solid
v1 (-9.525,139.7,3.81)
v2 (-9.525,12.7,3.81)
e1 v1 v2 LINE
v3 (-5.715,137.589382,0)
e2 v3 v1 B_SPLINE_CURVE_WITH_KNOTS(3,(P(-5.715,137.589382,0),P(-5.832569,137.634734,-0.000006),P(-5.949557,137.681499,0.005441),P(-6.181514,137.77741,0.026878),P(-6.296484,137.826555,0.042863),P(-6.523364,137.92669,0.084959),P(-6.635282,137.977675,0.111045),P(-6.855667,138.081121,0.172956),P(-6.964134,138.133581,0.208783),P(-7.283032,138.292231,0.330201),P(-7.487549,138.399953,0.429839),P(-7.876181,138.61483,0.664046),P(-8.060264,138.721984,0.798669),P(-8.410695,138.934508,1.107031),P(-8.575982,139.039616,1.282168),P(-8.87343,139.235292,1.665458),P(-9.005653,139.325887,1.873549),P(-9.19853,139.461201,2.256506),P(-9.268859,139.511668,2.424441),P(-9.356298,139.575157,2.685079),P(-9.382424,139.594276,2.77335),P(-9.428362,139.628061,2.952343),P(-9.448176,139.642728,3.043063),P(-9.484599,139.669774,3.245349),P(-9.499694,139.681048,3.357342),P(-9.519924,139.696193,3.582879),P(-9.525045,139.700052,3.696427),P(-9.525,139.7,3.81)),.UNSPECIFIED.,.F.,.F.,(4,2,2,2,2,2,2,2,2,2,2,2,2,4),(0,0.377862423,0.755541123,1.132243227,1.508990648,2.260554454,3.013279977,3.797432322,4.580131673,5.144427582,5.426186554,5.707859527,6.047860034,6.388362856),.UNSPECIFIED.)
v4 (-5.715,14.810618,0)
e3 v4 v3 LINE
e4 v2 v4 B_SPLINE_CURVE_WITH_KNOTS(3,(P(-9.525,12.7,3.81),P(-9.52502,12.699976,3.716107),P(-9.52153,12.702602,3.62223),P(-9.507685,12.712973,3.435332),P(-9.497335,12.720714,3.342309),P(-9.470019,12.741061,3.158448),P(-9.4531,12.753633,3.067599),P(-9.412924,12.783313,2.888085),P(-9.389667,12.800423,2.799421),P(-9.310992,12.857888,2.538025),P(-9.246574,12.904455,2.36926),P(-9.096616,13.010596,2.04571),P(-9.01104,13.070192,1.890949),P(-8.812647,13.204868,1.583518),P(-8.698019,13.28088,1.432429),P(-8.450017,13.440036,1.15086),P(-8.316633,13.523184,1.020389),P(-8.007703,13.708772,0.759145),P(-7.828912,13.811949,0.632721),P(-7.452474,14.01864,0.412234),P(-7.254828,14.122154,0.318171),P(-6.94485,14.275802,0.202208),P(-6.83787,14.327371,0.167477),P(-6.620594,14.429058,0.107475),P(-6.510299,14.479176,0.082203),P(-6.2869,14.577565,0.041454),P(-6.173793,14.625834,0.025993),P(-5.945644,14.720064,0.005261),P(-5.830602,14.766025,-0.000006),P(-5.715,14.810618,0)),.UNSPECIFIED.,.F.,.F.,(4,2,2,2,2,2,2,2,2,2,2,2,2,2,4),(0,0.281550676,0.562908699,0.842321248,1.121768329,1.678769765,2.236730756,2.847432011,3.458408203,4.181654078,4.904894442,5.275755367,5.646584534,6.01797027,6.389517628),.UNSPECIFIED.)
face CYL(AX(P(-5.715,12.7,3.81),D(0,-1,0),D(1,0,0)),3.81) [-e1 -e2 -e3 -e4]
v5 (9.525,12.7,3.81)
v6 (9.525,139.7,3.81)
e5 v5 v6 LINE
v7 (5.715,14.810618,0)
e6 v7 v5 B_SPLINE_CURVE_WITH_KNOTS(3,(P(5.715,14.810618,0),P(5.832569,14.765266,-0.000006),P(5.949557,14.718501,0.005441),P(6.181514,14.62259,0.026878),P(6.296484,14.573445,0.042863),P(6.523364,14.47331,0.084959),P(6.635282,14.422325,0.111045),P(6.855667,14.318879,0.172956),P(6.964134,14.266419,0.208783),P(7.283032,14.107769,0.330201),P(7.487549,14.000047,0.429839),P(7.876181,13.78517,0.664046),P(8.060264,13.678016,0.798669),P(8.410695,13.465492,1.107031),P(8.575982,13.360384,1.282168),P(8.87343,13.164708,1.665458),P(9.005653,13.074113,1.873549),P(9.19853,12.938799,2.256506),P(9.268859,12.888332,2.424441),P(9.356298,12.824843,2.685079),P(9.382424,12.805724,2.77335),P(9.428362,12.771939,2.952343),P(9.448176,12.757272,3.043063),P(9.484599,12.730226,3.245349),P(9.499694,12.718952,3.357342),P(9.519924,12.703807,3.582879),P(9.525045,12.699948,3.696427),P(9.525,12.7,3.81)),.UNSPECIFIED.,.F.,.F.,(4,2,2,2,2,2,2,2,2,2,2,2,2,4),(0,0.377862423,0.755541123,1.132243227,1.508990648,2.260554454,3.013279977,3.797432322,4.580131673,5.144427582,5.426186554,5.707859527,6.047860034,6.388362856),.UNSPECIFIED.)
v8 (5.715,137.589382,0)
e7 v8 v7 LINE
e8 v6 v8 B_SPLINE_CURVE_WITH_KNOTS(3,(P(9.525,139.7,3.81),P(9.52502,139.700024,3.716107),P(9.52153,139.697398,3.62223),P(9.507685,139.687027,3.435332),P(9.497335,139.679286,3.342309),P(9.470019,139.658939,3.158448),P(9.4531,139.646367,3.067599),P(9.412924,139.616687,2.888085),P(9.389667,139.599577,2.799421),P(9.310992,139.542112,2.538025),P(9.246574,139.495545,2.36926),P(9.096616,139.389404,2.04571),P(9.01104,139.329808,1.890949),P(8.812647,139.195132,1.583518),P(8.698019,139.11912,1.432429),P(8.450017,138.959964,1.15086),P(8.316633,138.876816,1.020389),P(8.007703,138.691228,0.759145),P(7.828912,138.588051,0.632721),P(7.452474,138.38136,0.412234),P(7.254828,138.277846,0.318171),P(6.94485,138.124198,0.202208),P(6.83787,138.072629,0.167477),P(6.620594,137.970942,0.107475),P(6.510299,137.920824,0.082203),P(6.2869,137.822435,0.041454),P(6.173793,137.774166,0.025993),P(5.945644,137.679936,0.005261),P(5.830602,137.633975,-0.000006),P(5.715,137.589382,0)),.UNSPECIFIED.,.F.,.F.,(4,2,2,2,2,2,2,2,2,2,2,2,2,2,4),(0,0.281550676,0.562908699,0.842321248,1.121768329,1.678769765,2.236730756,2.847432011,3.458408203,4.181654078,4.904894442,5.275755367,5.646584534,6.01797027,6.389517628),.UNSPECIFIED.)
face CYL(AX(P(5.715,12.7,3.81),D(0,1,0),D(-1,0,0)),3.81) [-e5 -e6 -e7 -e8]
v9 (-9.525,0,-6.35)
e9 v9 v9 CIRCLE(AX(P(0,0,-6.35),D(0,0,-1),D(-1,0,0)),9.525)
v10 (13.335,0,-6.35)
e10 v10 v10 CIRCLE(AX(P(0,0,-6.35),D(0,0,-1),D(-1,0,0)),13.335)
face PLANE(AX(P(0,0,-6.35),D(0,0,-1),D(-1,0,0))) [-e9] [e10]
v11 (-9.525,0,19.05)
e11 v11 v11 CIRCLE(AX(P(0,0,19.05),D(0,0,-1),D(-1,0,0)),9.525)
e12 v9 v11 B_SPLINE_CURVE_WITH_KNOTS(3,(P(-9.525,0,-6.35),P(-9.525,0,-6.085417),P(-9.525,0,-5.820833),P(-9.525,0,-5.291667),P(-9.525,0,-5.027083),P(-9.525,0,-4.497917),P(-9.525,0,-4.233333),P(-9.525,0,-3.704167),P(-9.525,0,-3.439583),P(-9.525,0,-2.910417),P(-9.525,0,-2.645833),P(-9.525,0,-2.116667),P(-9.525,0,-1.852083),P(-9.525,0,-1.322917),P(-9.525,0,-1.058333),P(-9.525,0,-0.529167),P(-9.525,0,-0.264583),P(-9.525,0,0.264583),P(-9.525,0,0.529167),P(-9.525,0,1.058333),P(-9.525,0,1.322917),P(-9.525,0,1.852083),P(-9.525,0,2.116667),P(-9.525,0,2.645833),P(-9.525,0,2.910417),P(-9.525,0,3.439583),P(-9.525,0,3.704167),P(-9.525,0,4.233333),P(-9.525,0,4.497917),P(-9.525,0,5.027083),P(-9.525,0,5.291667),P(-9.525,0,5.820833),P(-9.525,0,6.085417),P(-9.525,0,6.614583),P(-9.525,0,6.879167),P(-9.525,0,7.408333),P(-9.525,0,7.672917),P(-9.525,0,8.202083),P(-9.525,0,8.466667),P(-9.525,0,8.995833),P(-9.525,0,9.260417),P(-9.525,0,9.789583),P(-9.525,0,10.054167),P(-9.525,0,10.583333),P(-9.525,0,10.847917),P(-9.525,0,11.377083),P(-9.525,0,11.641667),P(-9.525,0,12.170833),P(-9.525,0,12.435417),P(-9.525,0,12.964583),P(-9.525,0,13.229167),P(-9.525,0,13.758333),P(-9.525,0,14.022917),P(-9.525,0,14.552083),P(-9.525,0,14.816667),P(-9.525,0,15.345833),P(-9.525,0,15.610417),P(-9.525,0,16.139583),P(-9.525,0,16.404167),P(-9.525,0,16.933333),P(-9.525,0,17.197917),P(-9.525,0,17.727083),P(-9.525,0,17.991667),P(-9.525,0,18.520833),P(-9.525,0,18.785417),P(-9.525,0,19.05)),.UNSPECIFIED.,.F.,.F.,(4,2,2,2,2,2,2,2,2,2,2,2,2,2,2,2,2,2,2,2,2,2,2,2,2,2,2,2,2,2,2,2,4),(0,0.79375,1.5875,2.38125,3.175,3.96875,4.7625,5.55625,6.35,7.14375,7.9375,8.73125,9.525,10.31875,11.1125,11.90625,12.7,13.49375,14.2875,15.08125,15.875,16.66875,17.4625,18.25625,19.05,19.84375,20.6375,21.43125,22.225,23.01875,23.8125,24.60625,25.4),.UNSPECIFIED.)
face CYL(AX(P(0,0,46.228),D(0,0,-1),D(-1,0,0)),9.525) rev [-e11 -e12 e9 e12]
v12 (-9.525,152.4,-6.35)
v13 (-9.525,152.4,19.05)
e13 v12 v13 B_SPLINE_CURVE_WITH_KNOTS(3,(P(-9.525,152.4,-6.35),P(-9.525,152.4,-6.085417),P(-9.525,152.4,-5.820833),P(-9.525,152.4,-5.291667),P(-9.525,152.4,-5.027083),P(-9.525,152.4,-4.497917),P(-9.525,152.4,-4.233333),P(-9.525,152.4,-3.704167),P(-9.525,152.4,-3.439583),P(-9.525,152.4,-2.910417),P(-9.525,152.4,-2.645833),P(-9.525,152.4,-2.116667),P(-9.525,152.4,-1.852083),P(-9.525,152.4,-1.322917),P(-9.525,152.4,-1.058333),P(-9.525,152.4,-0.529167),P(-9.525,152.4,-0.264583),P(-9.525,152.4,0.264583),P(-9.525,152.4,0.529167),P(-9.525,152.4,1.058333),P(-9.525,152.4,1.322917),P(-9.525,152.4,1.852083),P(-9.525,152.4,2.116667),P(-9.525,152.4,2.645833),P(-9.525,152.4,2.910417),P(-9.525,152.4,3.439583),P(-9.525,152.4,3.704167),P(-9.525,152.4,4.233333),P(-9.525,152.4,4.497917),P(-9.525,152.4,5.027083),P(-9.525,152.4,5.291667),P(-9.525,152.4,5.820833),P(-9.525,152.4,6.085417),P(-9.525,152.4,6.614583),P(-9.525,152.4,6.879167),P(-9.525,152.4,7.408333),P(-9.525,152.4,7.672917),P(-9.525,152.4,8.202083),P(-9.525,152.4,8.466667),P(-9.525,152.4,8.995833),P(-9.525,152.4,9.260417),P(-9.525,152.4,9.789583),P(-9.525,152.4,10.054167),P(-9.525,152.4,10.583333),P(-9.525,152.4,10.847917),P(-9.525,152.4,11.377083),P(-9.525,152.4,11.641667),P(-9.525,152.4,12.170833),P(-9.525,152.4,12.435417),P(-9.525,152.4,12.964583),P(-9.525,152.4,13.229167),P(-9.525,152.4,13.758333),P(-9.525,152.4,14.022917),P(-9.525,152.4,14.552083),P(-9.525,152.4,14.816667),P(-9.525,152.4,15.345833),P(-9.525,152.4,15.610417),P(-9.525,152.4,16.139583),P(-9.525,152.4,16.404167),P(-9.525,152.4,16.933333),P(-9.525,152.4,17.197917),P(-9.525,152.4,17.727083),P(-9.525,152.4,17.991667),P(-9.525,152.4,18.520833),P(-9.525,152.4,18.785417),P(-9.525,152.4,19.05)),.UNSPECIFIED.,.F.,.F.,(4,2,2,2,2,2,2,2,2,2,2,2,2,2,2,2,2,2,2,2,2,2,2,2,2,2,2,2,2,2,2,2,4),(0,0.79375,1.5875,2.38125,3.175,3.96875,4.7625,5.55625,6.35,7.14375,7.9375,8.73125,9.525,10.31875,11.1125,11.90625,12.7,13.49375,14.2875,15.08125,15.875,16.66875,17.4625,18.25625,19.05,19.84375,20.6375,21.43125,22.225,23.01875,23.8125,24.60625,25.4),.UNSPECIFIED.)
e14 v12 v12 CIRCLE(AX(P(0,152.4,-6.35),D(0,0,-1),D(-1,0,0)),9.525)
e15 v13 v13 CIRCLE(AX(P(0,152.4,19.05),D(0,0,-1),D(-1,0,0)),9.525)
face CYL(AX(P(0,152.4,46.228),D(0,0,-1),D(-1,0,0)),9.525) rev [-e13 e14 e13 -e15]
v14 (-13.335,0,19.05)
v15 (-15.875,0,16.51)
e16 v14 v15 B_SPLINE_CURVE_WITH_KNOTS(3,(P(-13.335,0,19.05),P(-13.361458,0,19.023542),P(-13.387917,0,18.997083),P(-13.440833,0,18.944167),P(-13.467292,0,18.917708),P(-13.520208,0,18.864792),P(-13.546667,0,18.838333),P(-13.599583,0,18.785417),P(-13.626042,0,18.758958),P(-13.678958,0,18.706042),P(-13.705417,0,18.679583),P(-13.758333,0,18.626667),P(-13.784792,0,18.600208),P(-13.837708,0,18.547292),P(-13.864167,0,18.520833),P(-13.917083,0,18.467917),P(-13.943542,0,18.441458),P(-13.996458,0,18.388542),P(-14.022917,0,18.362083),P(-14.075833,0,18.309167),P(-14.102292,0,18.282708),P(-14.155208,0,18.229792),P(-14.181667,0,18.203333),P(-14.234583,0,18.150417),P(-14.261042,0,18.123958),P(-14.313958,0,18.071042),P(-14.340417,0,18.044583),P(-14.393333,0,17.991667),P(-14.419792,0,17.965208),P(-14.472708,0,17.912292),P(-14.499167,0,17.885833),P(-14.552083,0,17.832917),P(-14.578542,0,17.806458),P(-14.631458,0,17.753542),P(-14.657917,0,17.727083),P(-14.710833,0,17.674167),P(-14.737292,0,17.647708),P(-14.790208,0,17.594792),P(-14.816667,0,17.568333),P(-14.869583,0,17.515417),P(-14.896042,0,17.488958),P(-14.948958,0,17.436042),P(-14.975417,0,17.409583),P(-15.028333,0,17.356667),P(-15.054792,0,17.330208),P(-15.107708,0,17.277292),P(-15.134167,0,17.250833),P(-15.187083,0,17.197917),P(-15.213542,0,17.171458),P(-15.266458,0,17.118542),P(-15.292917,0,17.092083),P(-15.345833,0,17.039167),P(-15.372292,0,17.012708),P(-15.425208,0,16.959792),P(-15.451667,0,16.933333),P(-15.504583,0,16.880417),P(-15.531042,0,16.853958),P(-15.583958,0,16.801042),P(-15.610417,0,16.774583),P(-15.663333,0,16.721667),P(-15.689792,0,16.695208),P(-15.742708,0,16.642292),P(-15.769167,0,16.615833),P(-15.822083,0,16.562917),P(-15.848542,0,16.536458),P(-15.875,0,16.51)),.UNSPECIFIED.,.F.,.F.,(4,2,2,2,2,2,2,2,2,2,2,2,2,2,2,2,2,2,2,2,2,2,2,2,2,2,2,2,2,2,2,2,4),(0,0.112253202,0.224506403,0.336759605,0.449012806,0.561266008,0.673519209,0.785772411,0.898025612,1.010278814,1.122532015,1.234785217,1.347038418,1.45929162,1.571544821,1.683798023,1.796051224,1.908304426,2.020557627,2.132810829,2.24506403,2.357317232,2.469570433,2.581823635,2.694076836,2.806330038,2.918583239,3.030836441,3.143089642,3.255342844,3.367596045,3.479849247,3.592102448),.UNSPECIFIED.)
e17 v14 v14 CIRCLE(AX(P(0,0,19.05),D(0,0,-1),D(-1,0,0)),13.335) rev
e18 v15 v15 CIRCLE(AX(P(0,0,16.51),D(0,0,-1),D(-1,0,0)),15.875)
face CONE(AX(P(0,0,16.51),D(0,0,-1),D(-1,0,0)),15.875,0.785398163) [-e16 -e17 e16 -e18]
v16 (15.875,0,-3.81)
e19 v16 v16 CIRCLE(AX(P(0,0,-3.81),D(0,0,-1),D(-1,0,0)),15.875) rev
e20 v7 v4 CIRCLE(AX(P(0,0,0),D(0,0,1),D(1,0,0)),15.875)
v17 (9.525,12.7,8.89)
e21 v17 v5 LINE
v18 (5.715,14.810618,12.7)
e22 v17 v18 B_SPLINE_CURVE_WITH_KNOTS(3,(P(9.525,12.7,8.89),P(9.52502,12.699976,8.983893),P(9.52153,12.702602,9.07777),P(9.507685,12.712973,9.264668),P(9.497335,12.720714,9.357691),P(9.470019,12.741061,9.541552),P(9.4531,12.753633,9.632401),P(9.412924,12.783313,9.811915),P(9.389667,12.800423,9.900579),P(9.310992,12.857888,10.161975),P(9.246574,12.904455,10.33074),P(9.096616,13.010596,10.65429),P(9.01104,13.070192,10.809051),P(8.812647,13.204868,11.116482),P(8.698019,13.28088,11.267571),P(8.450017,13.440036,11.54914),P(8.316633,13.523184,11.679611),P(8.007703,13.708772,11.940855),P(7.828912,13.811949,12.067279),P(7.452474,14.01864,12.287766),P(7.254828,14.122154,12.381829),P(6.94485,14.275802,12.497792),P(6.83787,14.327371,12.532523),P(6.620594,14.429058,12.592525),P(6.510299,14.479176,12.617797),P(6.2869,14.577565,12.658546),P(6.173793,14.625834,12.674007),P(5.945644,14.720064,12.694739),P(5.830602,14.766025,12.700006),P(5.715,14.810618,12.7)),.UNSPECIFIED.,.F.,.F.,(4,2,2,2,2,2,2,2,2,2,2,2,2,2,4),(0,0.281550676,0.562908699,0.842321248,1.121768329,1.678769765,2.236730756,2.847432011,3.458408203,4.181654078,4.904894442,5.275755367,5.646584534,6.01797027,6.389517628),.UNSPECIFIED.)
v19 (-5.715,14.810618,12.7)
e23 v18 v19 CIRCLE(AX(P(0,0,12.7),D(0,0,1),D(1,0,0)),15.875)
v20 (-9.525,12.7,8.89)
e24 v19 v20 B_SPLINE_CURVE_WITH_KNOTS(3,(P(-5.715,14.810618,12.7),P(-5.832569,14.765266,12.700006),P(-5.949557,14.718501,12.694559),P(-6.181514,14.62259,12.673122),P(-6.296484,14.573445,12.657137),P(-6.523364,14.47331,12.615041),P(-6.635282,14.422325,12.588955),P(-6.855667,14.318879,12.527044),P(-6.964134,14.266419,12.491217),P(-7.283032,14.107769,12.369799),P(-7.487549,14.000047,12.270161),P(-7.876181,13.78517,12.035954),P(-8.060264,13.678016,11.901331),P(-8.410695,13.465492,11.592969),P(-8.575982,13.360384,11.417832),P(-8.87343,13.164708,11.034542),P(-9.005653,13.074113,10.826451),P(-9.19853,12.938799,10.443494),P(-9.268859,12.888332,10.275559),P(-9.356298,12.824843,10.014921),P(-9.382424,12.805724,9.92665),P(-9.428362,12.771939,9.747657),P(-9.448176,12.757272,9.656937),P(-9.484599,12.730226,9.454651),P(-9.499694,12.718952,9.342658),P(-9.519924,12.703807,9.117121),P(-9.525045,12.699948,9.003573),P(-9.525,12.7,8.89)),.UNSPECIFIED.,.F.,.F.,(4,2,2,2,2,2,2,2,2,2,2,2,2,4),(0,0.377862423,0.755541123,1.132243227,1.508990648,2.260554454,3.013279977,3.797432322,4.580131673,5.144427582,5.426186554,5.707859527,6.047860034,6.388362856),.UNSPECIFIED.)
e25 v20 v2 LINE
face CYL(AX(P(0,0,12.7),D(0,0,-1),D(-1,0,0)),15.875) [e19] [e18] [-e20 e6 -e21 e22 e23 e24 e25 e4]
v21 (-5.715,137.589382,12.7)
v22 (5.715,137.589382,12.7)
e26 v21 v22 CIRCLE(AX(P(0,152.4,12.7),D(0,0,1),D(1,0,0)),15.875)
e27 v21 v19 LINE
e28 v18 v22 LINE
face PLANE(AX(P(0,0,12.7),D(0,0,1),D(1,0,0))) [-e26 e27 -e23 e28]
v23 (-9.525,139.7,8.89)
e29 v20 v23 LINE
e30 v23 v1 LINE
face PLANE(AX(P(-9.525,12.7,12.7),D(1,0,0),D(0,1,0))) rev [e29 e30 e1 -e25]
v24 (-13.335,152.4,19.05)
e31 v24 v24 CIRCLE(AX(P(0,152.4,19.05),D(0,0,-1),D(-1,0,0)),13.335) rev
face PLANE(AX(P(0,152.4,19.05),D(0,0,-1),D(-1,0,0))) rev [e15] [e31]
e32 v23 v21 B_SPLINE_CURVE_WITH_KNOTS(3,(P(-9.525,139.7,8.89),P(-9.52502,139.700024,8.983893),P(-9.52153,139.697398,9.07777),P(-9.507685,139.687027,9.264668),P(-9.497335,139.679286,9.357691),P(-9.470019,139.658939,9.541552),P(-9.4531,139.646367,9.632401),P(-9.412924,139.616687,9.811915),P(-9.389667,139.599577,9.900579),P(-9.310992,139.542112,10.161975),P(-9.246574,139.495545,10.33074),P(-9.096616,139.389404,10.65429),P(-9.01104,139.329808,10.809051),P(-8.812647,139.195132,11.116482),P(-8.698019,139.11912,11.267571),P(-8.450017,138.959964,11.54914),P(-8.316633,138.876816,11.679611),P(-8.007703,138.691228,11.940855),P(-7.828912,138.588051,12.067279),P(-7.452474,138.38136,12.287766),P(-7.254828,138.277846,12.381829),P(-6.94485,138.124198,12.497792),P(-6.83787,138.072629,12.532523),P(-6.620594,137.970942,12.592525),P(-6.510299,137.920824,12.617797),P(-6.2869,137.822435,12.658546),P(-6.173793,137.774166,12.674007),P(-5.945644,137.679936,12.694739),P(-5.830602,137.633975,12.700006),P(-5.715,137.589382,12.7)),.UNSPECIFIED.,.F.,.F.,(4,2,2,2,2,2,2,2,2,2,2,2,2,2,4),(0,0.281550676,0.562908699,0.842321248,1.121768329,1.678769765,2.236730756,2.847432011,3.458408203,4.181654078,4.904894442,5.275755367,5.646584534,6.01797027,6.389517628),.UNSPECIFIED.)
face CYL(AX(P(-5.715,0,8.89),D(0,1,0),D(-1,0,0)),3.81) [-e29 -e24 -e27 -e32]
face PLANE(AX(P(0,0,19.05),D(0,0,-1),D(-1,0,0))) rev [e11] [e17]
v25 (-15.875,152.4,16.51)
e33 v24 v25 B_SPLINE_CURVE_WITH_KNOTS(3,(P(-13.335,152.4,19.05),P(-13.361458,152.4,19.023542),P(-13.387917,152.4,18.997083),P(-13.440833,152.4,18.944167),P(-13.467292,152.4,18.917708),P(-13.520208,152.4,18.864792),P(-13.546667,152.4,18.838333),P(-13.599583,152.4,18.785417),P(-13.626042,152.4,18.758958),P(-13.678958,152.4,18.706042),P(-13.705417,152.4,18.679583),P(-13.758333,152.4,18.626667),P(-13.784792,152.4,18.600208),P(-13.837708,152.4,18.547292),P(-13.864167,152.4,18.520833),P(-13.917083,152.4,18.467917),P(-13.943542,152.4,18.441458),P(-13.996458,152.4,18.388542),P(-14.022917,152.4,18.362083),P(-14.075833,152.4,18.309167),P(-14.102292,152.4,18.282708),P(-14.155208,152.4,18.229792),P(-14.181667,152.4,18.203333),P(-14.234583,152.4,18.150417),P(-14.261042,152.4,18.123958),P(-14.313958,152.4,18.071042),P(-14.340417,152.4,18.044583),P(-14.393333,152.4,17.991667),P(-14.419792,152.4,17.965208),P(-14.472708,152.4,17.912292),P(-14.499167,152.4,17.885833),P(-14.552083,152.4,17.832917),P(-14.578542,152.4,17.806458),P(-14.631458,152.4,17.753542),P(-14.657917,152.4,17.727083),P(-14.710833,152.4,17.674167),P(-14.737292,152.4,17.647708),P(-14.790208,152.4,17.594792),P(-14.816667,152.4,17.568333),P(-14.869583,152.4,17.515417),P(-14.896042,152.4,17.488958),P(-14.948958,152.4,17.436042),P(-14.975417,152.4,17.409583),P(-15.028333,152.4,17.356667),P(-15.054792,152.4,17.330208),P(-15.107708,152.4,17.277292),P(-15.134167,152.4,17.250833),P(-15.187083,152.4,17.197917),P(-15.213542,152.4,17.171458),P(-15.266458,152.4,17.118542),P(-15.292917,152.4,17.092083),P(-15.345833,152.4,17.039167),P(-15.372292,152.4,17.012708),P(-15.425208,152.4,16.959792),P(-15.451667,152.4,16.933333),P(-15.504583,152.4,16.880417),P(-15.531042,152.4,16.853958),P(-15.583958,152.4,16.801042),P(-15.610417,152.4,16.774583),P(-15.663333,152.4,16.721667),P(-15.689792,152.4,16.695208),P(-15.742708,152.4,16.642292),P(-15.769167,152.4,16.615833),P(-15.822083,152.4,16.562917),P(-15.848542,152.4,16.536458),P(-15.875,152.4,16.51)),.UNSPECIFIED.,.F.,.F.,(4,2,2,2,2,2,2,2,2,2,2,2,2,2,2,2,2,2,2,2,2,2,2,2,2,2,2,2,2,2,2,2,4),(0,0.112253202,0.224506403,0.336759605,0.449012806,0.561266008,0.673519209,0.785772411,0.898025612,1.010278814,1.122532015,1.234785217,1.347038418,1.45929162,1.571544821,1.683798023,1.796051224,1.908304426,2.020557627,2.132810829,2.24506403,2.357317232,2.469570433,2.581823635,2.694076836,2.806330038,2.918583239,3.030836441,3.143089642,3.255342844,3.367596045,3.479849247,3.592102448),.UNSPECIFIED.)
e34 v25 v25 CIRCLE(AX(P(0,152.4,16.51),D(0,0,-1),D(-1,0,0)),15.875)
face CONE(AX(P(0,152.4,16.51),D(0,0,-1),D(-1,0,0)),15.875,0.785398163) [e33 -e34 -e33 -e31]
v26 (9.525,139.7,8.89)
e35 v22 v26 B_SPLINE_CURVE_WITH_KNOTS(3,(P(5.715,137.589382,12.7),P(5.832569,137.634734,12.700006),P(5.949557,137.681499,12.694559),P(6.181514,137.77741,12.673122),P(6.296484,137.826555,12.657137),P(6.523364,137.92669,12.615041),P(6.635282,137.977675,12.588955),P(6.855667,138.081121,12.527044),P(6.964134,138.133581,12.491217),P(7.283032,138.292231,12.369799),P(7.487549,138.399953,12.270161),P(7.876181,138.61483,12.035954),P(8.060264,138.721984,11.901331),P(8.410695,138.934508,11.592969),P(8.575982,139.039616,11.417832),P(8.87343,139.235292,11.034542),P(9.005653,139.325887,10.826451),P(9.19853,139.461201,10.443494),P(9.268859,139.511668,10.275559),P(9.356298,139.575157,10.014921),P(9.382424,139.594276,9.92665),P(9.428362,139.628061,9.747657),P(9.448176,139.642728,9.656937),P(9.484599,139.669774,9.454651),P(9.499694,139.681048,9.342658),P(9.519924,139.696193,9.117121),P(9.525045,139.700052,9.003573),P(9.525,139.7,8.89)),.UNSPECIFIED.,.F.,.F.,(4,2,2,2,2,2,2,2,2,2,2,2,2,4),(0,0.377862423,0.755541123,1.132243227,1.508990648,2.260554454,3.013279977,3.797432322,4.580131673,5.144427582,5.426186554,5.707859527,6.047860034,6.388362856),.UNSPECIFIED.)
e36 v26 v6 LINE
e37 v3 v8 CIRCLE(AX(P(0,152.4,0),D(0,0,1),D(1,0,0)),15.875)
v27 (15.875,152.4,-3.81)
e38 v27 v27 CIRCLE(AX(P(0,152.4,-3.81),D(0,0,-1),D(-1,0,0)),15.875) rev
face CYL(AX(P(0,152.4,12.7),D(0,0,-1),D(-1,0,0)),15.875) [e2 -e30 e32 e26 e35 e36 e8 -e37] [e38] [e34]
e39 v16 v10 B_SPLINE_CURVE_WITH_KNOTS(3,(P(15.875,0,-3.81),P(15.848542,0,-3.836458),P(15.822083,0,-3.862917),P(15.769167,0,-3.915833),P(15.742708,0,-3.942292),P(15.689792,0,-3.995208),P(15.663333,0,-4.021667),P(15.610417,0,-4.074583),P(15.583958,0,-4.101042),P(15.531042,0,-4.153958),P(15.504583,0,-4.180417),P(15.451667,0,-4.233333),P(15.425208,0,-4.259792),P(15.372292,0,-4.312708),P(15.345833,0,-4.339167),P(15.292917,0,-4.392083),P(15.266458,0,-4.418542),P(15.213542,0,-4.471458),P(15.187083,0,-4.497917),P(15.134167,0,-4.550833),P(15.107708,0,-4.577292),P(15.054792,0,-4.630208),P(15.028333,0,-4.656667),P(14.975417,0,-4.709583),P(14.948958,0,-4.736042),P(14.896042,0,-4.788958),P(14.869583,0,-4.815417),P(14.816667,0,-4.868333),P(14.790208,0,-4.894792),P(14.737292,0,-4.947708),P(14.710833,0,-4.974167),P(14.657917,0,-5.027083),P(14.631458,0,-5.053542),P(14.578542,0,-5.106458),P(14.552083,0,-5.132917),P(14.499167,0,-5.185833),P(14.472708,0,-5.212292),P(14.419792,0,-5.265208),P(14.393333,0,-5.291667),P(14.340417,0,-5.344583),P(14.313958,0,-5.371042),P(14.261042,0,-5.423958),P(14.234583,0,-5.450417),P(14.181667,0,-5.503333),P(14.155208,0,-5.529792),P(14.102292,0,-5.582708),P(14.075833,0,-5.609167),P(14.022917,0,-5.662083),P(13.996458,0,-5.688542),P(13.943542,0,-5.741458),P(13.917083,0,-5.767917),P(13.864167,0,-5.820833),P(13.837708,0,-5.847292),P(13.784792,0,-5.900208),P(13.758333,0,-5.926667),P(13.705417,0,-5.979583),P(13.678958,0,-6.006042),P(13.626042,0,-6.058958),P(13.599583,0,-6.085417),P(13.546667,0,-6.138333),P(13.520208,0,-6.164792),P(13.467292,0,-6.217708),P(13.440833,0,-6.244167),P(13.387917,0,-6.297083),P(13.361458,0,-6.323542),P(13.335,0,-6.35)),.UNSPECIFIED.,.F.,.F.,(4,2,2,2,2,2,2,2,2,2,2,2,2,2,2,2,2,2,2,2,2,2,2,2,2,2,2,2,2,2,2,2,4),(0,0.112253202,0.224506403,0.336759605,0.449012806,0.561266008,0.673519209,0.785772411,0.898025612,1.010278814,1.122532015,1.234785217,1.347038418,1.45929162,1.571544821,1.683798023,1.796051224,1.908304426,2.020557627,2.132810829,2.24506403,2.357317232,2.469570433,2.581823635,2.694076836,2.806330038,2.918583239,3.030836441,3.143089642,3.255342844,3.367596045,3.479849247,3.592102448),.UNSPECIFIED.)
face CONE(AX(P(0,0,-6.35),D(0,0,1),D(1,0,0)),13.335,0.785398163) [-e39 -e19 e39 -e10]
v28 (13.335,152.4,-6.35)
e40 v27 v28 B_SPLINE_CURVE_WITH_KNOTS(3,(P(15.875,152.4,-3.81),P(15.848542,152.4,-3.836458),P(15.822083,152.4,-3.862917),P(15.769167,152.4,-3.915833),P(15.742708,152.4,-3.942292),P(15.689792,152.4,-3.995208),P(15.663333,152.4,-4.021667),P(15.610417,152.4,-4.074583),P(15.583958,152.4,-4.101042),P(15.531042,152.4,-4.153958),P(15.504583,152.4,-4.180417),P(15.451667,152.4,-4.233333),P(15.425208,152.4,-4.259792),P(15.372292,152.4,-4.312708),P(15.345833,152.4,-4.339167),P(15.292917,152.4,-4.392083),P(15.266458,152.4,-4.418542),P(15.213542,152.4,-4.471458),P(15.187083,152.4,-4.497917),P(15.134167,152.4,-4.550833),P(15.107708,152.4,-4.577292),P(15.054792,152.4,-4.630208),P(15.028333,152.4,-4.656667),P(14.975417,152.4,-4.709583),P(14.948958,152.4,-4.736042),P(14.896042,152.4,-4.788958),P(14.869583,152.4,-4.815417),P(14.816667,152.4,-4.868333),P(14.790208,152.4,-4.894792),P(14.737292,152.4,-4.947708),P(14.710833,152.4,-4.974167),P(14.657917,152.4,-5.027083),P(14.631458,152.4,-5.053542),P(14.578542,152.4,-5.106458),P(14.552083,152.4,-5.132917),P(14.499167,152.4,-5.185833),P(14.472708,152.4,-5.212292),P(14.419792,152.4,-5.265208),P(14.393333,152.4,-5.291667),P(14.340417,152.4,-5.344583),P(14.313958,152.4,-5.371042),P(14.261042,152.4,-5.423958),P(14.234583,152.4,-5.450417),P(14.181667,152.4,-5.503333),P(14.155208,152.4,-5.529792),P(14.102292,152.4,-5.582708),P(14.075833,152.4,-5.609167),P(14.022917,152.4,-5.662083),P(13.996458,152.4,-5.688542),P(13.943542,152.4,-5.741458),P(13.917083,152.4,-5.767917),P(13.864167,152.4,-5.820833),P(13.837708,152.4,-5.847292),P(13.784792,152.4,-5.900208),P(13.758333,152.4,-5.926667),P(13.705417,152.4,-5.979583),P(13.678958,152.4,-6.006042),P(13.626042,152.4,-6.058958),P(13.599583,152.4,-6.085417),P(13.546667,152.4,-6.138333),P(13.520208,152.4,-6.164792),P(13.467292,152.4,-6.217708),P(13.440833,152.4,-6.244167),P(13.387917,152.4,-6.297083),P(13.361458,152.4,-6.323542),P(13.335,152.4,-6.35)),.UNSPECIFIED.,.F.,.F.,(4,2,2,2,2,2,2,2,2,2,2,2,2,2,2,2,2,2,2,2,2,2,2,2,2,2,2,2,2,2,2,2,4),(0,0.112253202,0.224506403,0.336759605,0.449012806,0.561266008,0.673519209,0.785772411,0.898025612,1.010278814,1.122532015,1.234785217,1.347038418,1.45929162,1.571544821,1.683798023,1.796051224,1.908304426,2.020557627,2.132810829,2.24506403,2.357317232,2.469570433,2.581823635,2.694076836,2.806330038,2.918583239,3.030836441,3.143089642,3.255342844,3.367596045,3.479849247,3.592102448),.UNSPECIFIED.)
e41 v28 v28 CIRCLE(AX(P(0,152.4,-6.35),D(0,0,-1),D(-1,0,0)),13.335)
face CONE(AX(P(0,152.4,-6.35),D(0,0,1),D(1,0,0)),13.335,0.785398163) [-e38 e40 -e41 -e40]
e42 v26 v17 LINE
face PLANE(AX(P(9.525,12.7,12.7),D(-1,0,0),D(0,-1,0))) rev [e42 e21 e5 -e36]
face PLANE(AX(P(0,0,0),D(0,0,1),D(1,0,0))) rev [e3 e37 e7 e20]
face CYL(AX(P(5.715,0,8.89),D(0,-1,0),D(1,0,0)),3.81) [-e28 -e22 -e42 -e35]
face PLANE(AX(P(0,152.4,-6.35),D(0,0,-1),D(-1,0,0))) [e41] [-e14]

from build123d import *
from build123d.topology import SkipClean

# Parameters (mm, degrees)
BOSS_EXTRUDE1_DEPTH      = 12.7
BOSS_EXTRUDE2_DEPTH      = 6.35
BOSS_EXTRUDE2_DEPTH_BACK = 19.05
SKETCH3_R                = 15.875
FILLET1_R                = 3.81
SKETCH4_R                = 9.525
CUT_EXTRUDE1_DEPTH       = 52.578
CHAMFER1_SIZE            = 2.54


with BuildPart() as part:
    # Sketch2 → Boss-Extrude1 (new body)
    with BuildSketch(Plane.XY):
        with BuildLine():
            Line((-9.525, 12.7), (-9.525, 139.7))
            ThreePointArc((-9.525, 139.7), (0, 168.275), (9.525, 139.7))
            Line((9.525, 139.7), (9.525, 12.7))
            ThreePointArc((9.525, 12.7), (0, -15.875), (-9.525, 12.7))
        make_face()
    extrude(amount=BOSS_EXTRUDE1_DEPTH)

    # Sketch3 → Boss-Extrude2 (add, two sides: drawn at the far end of the back side and taken through both)
    with SkipClean():  # the faces are left unmerged after this step: merging them gives an invalid solid
        with BuildSketch(Plane(origin=(0, 0, 0), x_dir=(-1, 0, 0), z_dir=(0, 0, -1)).offset(-BOSS_EXTRUDE2_DEPTH_BACK)):
            with Locations((0, 152.4)):
                Circle(SKETCH3_R)
            Circle(SKETCH3_R)
        extrude(amount=BOSS_EXTRUDE2_DEPTH + BOSS_EXTRUDE2_DEPTH_BACK)
    add(part.part.scale(1), mode=Mode.REPLACE)  # the faces are merged on a copy

    # Fillet1
    # the kernel refuses this fillet: 3.81 mm, written as the material it takes off along each edge
    with BuildSketch(Plane(origin=(-9.525, 3.175, 12.7), x_dir=(1, 0, 0), z_dir=(0, 1, 0))) as fillet1_piece_1_section:
        with BuildLine():
            CenterArc((FILLET1_R, FILLET1_R), FILLET1_R, 180, 90)
            Line((0, FILLET1_R), (0, 0))
            Line((0, 0), (FILLET1_R, 0))
        make_face()
    fillet1_piece_1 = extrude(amount=146.05, mode=Mode.PRIVATE)
    fillet1_piece_1 = fillet1_piece_1 - Plane(origin=(0, 152.4, 11.833457617), x_dir=(-1, 0, 0), z_dir=(0, 0, -1)) * Cylinder(15.875, 308, mode=Mode.PRIVATE)
    fillet1_piece_1 = fillet1_piece_1 - Plane(origin=(0, 0, 11.833457617), x_dir=(-1, 0, 0), z_dir=(0, 0, -1)) * Cylinder(15.875, 308, mode=Mode.PRIVATE)
    add(fillet1_piece_1, mode=Mode.SUBTRACT)
    with BuildSketch(Plane(origin=(-9.525, 3.175, 0), x_dir=(1, 0, 0), z_dir=(0, 1, 0))) as fillet1_piece_2_section:
        with BuildLine():
            CenterArc((FILLET1_R, -FILLET1_R), FILLET1_R, 90, 90)
            Line((0, -FILLET1_R), (0, 0))
            Line((0, 0), (FILLET1_R, 0))
        make_face()
    fillet1_piece_2 = extrude(amount=146.05, mode=Mode.PRIVATE)
    fillet1_piece_2 = fillet1_piece_2 - Plane(origin=(0, 152.4, 0.866542383), x_dir=(-1, 0, 0), z_dir=(0, 0, 1)) * Cylinder(15.875, 308, mode=Mode.PRIVATE)
    fillet1_piece_2 = fillet1_piece_2 - Plane(origin=(0, 0, 0.866542383), x_dir=(-1, 0, 0), z_dir=(0, 0, 1)) * Cylinder(15.875, 308, mode=Mode.PRIVATE)
    add(fillet1_piece_2, mode=Mode.SUBTRACT)
    with BuildSketch(Plane(origin=(9.525, 149.225, 0), x_dir=(0, 0, 1), z_dir=(0, -1, 0))) as fillet1_piece_3_section:
        with BuildLine():
            CenterArc((FILLET1_R, FILLET1_R), FILLET1_R, 180, 90)
            Line((0, FILLET1_R), (0, 0))
            Line((0, 0), (FILLET1_R, 0))
        make_face()
    fillet1_piece_3 = extrude(amount=146.05, mode=Mode.PRIVATE)
    fillet1_piece_3 = fillet1_piece_3 - Plane(origin=(0, 152.4, 0.866542379), x_dir=(-0.5999999999999995, -0.8000000000000005, 0), z_dir=(0, 0, -1)) * Cylinder(15.875, 308, mode=Mode.PRIVATE)
    fillet1_piece_3 = fillet1_piece_3 - Plane(origin=(0, 0, 0.866542379), x_dir=(0.6000000000000001, 0.7999999999999999, 0), z_dir=(0, 0, -1)) * Cylinder(15.875, 308, mode=Mode.PRIVATE)
    add(fillet1_piece_3, mode=Mode.SUBTRACT)
    with BuildSketch(Plane(origin=(9.525, 149.225, 12.7), x_dir=(0, 0, -1), z_dir=(0, -1, 0))) as fillet1_piece_4_section:
        with BuildLine():
            CenterArc((FILLET1_R, -FILLET1_R), FILLET1_R, 90, 90)
            Line((0, -FILLET1_R), (0, 0))
            Line((0, 0), (FILLET1_R, 0))
        make_face()
    fillet1_piece_4 = extrude(amount=146.05, mode=Mode.PRIVATE)
    fillet1_piece_4 = fillet1_piece_4 - Plane(origin=(0, 152.4, 11.833457621), x_dir=(-0.5999999999999995, -0.8000000000000005, 0), z_dir=(0, 0, -1)) * Cylinder(15.875, 308, mode=Mode.PRIVATE)
    fillet1_piece_4 = fillet1_piece_4 - Plane(origin=(0, 0, 11.833457621), x_dir=(0.6000000000000001, 0.7999999999999999, 0), z_dir=(0, 0, -1)) * Cylinder(15.875, 308, mode=Mode.PRIVATE)
    add(fillet1_piece_4, mode=Mode.SUBTRACT)

    # Sketch4 → Cut-Extrude1 (cut)
    with BuildSketch(Plane(origin=(0, 0, -6.35), x_dir=(-1, 0, 0), z_dir=(0, 0, -1))):
        with Locations((0, 152.4)):
            Circle(SKETCH4_R)
        Circle(SKETCH4_R)
    extrude(amount=-CUT_EXTRUDE1_DEPTH, mode=Mode.SUBTRACT)

    # Chamfer1
    chamfer1_edges = [part.edges().sort_by_distance(p)[0] for p in [
        (15.875, 152.4, 19.05),
        (15.875, 152.4, -6.35),
        (15.875, 0, 19.05),
        (15.875, 0, -6.35),
    ]]
    chamfer(chamfer1_edges, length=CHAMFER1_SIZE)


solid = part.part
